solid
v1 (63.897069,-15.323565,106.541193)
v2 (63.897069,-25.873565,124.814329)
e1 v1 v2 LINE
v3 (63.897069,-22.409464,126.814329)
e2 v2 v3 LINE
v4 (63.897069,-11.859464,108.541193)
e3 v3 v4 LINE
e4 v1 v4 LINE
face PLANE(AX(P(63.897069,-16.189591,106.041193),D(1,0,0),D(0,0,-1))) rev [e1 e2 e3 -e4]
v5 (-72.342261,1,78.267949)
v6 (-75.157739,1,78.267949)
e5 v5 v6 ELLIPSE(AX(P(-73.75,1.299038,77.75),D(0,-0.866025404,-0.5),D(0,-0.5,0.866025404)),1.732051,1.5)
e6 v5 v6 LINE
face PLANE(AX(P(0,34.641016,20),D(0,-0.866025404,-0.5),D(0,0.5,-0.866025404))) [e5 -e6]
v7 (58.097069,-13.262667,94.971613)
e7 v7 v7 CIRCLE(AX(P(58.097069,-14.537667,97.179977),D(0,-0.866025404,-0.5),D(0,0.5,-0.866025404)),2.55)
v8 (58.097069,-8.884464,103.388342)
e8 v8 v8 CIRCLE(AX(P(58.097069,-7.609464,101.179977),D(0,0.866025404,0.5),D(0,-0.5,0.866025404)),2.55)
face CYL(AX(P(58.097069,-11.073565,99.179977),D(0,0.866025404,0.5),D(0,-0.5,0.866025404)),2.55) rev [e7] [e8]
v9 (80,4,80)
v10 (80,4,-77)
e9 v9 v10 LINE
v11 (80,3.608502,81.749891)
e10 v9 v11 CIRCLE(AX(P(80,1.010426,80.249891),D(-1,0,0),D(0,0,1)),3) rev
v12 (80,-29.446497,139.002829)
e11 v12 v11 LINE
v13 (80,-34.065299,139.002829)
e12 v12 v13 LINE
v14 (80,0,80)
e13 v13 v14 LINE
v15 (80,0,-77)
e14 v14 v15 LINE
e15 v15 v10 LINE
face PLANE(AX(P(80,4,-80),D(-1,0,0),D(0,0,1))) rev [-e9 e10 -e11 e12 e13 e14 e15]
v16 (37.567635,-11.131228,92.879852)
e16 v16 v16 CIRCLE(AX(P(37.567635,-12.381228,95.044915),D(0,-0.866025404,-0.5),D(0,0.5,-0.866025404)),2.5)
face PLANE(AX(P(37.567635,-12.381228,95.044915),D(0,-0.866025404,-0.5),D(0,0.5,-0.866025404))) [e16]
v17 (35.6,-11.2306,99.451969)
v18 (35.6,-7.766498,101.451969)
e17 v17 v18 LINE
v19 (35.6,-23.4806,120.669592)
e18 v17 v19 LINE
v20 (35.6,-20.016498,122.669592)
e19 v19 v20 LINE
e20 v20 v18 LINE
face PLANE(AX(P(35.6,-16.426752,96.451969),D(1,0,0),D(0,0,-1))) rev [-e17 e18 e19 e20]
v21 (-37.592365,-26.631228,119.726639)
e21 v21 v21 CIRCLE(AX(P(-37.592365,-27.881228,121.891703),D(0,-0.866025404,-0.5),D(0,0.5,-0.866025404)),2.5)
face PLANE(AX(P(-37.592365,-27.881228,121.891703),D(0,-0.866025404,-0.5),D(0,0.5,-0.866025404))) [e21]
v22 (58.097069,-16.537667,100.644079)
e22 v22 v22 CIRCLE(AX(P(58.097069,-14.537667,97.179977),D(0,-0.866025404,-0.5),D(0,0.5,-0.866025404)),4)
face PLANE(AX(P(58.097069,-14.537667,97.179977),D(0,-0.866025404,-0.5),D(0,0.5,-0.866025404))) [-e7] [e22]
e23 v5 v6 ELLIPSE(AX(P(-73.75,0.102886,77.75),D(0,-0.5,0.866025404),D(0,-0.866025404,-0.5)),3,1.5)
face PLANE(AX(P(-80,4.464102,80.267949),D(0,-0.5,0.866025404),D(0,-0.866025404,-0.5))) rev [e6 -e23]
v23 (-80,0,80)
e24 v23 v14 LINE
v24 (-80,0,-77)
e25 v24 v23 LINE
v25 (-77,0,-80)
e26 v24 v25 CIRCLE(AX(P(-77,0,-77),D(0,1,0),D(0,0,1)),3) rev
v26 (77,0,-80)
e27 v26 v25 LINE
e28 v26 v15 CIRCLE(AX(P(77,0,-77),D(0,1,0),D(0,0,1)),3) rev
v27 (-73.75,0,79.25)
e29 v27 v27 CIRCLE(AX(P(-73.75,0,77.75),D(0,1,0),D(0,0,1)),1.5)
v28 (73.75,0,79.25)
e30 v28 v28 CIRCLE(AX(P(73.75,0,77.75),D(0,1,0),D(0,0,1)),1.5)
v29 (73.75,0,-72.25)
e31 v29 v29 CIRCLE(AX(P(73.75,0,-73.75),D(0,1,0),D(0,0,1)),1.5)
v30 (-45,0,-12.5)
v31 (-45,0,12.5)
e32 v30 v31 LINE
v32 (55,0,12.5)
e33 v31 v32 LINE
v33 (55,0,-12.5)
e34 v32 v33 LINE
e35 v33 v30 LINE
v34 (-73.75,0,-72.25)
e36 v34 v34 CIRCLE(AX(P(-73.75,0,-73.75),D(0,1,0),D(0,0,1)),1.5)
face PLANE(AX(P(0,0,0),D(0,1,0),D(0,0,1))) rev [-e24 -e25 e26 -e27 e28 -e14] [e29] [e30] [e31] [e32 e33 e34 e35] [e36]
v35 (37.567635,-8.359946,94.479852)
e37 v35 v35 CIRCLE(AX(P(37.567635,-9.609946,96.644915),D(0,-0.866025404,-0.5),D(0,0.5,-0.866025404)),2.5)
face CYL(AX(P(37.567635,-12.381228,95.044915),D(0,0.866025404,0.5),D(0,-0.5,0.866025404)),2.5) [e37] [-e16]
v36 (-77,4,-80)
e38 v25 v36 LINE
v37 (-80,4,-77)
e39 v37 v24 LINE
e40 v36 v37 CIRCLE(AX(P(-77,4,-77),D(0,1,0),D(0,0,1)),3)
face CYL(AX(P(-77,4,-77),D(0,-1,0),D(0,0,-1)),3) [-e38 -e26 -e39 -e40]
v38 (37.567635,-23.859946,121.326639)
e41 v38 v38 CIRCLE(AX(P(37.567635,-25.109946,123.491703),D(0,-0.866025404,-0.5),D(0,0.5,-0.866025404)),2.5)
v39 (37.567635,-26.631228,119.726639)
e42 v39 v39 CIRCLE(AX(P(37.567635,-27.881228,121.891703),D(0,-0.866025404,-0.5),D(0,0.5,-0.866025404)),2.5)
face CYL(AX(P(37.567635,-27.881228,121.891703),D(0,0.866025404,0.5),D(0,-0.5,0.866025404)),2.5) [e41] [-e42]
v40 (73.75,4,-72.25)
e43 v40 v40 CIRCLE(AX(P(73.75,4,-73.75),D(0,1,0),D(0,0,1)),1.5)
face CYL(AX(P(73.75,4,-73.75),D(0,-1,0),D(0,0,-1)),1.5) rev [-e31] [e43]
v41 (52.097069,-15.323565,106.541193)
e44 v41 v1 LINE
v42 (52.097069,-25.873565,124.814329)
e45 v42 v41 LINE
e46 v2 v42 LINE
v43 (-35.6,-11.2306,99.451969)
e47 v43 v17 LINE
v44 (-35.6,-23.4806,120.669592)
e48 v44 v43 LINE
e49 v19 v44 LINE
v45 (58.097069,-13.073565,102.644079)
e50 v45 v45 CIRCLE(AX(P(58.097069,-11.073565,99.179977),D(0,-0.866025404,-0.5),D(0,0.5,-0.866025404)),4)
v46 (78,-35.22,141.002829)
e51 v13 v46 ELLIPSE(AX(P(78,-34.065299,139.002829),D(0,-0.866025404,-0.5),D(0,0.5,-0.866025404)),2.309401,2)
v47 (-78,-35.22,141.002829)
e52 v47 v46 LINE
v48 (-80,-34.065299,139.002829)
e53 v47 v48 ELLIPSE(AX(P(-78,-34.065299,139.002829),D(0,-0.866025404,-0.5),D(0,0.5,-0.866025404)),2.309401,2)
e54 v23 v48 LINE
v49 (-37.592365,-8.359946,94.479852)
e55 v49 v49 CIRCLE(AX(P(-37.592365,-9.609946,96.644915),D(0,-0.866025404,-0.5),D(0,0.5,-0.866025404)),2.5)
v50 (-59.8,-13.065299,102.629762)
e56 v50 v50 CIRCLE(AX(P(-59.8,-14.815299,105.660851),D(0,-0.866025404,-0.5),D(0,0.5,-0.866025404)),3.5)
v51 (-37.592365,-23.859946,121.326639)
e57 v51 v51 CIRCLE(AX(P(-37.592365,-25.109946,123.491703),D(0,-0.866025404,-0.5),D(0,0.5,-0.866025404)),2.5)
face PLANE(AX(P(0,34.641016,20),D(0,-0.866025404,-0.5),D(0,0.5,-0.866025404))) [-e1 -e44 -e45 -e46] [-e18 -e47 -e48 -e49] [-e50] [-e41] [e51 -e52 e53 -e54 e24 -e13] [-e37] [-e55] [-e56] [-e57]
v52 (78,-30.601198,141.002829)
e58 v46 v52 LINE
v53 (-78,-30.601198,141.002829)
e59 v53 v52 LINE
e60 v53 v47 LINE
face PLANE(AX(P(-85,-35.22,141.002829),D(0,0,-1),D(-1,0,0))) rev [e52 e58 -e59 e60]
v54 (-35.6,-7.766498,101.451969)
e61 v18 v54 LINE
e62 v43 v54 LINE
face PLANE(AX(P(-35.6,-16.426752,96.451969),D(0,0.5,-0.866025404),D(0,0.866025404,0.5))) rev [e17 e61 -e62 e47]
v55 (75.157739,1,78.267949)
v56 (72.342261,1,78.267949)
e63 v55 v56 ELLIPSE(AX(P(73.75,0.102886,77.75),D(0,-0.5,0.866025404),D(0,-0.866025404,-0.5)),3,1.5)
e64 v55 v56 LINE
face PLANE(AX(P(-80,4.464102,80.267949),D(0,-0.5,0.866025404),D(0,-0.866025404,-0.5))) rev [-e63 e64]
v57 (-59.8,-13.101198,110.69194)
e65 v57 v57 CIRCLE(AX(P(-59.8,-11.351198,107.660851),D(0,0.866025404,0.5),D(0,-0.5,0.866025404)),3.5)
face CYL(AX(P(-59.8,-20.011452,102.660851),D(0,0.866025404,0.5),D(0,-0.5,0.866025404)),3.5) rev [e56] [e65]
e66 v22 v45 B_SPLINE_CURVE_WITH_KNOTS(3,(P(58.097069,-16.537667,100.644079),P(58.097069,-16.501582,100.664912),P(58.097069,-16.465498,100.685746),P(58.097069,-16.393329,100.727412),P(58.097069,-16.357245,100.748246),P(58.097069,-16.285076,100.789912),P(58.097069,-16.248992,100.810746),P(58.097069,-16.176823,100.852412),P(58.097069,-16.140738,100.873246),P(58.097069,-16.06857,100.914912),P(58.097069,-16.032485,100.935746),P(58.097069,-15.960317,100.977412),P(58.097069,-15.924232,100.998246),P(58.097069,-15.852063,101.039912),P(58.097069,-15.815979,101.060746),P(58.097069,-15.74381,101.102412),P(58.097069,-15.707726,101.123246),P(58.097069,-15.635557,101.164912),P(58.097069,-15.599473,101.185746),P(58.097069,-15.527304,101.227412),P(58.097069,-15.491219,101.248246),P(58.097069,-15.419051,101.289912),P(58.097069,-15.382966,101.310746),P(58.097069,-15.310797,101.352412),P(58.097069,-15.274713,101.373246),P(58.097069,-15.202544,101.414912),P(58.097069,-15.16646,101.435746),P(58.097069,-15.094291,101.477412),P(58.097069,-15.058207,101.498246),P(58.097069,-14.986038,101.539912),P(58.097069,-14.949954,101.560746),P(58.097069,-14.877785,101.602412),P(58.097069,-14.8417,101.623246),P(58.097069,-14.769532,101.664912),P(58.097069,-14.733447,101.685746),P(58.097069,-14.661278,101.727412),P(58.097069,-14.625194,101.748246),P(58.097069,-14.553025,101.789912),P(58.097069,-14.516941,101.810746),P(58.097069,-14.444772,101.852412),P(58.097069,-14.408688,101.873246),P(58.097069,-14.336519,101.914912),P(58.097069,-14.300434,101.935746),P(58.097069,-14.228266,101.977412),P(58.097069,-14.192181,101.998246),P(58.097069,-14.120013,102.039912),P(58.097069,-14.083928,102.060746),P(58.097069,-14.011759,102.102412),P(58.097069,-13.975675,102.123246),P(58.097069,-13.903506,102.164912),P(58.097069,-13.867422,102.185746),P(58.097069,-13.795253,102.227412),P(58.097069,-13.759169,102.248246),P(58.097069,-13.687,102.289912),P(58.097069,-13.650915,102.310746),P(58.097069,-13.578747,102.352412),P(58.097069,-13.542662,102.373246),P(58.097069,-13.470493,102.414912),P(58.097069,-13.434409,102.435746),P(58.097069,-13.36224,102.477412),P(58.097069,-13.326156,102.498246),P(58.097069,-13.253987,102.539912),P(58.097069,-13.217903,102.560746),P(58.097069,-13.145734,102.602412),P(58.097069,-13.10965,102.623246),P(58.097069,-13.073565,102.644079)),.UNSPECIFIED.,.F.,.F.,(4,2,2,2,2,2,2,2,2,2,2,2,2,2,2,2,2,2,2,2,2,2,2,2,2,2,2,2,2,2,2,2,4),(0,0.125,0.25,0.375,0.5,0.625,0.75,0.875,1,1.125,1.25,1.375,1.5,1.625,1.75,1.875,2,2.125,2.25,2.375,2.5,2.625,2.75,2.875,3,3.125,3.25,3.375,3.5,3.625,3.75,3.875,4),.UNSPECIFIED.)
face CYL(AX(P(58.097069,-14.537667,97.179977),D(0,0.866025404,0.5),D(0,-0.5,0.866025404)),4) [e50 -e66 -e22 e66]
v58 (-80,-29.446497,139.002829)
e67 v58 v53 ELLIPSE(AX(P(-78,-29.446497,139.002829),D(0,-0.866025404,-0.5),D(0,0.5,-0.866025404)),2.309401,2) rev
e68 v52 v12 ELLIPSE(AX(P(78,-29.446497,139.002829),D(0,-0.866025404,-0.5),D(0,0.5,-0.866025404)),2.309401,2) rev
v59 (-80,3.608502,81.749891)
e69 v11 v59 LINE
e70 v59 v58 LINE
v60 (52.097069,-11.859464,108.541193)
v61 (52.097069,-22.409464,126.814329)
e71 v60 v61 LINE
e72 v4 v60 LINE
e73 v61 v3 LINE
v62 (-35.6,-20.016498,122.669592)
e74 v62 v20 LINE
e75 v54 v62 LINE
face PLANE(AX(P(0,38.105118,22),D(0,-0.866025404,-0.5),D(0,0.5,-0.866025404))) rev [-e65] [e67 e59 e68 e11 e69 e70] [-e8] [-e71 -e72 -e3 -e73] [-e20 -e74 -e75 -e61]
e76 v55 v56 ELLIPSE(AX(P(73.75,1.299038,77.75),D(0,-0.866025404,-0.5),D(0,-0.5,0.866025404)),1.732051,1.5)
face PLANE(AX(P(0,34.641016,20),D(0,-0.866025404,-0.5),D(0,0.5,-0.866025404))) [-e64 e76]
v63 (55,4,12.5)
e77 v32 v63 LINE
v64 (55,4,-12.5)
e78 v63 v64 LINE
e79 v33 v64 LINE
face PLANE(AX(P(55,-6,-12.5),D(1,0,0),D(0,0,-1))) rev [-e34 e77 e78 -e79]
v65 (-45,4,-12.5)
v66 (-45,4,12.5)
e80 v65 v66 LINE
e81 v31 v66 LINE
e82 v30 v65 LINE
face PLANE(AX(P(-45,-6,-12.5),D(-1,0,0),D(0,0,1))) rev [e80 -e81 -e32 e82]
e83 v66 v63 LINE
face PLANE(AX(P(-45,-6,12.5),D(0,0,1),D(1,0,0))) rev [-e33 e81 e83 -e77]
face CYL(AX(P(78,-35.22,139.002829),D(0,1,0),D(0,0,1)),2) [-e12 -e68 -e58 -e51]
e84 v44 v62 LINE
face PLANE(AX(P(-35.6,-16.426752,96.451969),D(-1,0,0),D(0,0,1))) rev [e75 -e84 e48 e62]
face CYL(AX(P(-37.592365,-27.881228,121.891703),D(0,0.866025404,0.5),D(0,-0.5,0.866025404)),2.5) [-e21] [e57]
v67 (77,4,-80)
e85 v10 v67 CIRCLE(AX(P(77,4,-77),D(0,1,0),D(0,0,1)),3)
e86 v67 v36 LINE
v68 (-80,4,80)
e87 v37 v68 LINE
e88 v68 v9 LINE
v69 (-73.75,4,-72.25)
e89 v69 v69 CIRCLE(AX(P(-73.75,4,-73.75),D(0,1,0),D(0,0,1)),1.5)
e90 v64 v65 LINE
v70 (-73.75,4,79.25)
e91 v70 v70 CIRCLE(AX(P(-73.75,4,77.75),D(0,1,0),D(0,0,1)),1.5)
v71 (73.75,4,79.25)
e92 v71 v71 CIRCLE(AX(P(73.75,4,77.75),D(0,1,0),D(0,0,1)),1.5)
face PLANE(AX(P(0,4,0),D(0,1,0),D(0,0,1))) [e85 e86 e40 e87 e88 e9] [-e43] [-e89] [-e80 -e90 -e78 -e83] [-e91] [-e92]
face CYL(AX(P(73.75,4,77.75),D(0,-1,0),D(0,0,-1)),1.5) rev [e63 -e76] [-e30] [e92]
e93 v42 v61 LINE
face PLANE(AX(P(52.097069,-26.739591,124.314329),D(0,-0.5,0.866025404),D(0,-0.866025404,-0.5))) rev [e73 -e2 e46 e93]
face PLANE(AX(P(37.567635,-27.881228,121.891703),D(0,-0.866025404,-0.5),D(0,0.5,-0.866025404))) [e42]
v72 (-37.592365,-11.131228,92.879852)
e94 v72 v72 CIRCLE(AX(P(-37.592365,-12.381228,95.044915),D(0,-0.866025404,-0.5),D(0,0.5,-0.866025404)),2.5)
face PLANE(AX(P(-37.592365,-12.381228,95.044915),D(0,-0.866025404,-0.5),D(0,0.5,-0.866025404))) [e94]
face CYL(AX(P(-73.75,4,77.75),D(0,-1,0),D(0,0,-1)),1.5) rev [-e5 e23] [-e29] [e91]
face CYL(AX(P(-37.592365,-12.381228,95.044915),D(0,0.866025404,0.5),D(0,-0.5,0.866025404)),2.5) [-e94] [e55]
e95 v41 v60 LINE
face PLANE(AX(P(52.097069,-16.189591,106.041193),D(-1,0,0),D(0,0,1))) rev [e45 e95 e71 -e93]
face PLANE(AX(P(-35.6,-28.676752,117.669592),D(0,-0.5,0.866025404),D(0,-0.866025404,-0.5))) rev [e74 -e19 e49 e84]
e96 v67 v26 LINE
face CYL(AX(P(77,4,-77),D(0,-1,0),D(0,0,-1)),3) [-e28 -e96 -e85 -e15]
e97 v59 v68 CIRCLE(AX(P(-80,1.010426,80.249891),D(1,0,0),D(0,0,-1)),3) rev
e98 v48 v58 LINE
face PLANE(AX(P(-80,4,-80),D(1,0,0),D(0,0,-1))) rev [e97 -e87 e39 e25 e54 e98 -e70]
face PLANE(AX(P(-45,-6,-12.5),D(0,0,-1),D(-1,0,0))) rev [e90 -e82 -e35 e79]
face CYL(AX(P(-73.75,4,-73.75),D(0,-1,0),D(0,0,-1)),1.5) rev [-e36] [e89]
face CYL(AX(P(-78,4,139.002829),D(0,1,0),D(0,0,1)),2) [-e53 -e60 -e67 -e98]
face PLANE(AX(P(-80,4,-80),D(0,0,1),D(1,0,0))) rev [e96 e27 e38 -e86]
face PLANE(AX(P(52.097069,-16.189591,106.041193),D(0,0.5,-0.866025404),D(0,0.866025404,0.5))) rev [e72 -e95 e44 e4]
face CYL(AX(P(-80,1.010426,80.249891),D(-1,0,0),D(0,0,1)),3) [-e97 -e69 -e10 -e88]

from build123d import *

# Parameters (mm, degrees)
SKETCH1_W           = 160
SKETCH1_H           = 160
SKETCH1_R           = 1.5
BOSS_EXTRUDE1_DEPTH = 4
SKETCH5_W           = 160
SKETCH5_H           = 75
BOSS_EXTRUDE4_DEPTH = 4
FILLET1_R           = 3
FILLET2_R           = 3
FILLET3_R           = 3
CUT_EXTRUDE6_DEPTH  = 165
FILLET8_R           = 2
FILLET9_R           = 2
SKETCH13_W          = 100
SKETCH13_H          = 25
CUT_EXTRUDE7_DEPTH  = 10
SKETCH17_W          = 71.2
SKETCH17_H          = 24.5
CUT_EXTRUDE10_DEPTH = 10
SKETCH20_R          = 2.5
BOSS_EXTRUDE5_DEPTH = 3.2
SKETCH21_W          = 11.8
SKETCH21_H          = 21.1
CUT_EXTRUDE11_DEPTH = 5
SKETCH23_R          = 2.55
CUT_EXTRUDE12_DEPTH = 4
SKETCH24_R          = 4
BOSS_EXTRUDE6_DEPTH = 4
SKETCH25_R          = 2.55
CUT_EXTRUDE15_DEPTH = 4
SKETCH26_R          = 3.5
CUT_EXTRUDE16_DEPTH = 10


with BuildPart() as part:
    # Sketch1 → Boss-Extrude1 (new body)
    with BuildSketch(Plane(origin=(0, 0, 0), x_dir=(1, 0, 0), z_dir=(0, 1, 0))):
        Rectangle(SKETCH1_W, SKETCH1_H)
        with Locations(Location((-73.75, 73.75, 0), (0, 0, 270))):
            Circle(SKETCH1_R, mode=Mode.SUBTRACT)
        with Locations(Location((73.75, 73.75, 0), (0, 0, 270))):
            Circle(SKETCH1_R, mode=Mode.SUBTRACT)
        with Locations(Location((-73.75, -77.75, 0), (0, 0, 270))):
            Circle(SKETCH1_R, mode=Mode.SUBTRACT)
        with Locations(Location((73.75, -77.75, 0), (0, 0, 270))):
            Circle(SKETCH1_R, mode=Mode.SUBTRACT)
    extrude(amount=BOSS_EXTRUDE1_DEPTH)

    # Sketch5 → Boss-Extrude4 (add)
    with BuildSketch(Plane(origin=(0, 34.641016151, 20), x_dir=(1, 0, 0), z_dir=(0, 0.8660254037844346, 0.5000000000000071))):
        with Locations((0, -104.782032303)):
            Rectangle(SKETCH5_W, SKETCH5_H)
    extrude(amount=BOSS_EXTRUDE4_DEPTH)

    # Fillet1
    # the kernel refuses this fillet: 3 mm, written as the material it takes off along each edge
    with BuildSketch(Plane(origin=(-84.277998386, 4.464101615, 80.267949192), x_dir=(0, -0.8660254037849107, -0.4999999999991824), z_dir=(1, 0, 0))) as fillet1_piece_1:
        with BuildLine():
            CenterArc((3, -1.711199354), FILLET1_R, 145.221891332, 34.778108668)
            Line((0, -1.711199354), (-0.06, -1.711199354))
            Line((-0.06, -1.711199354), (-0.06, 0))
            Line((-0.06, 0), (0, 0.06))
            ThreePointArc((0, 0.06), (0.267949192, 0.06), (0.486616353, 0.034223987))
            Line((0.486616353, 0.034223987), (0.535898385, 0))
        make_face()
    extrude(amount=168.555996772, mode=Mode.SUBTRACT)

    # Fillet2
    fillet2_edges = [part.edges().sort_by_distance(p)[0] for p in [
        (80, 2, -80),
    ]]
    fillet(fillet2_edges, radius=FILLET2_R)

    # Fillet3
    fillet3_edges = [part.edges().sort_by_distance(p)[0] for p in [
        (-80, 2, -80),
    ]]
    fillet(fillet3_edges, radius=FILLET3_R)

    # Sketch12 → Cut-Extrude6 (cut)
    with BuildSketch(Plane(origin=(80, 0, 0), x_dir=(0, 0, -1), z_dir=(1, 0, 0))):
        Polygon((-145.219854476, -33.035898385), (-143.219854476, -36.5), (-141.002829443, -35.22), (-141.002829443, -30.601197846), align=None)
    extrude(amount=-CUT_EXTRUDE6_DEPTH, mode=Mode.SUBTRACT)

    # Fillet8
    fillet8_edges = [part.edges().sort_by_distance(p)[0] for p in [
        (80, -32.910598923, 141.002829443),
    ]]
    fillet(fillet8_edges, radius=FILLET8_R)

    # Fillet9
    fillet9_edges = [part.edges().sort_by_distance(p)[0] for p in [
        (-80, -32.910598923, 141.002829443),
    ]]
    fillet(fillet9_edges, radius=FILLET9_R)

    # Sketch13 → Cut-Extrude7 (cut)
    with BuildSketch(Plane(origin=(0, 4, 0), x_dir=(1, 0, 0), z_dir=(0, 1, 0))):
        with Locations((5, 0)):
            Rectangle(SKETCH13_W, SKETCH13_H)
    extrude(amount=-CUT_EXTRUDE7_DEPTH, mode=Mode.SUBTRACT)

    # Sketch17 → Cut-Extrude10 (cut)
    with BuildSketch(Plane(origin=(0, 38.105117767, 22), x_dir=(1, 0, 0), z_dir=(0, 0.8660254037844344, 0.5000000000000073))):
        with Locations((0, -103.993231657)):
            Rectangle(SKETCH17_W, SKETCH17_H)
    extrude(amount=-CUT_EXTRUDE10_DEPTH, mode=Mode.SUBTRACT)

    # Sketch20 → Boss-Extrude5 (add)
    with BuildSketch(Plane(origin=(0, 34.641016151, 20), x_dir=(1, 0, 0), z_dir=(0, -0.8660254037844344, -0.5000000000000073))):
        with Locations(Location((-37.592365001, 119.501924995, 0), (0, 0, 270))):
            Circle(SKETCH20_R)
        with Locations(Location((37.567634999, 88.501924995, 0), (0, 0, 270))):
            Circle(SKETCH20_R)
        with Locations(Location((37.567634999, 119.501924995, 0), (0, 0, 270))):
            Circle(SKETCH20_R)
        with Locations(Location((-37.592365001, 88.501924995, 0), (0, 0, 270))):
            Circle(SKETCH20_R)
    extrude(amount=BOSS_EXTRUDE5_DEPTH)

    # Sketch21 → Cut-Extrude11 (cut)
    with BuildSketch(Plane(origin=(0, 38.105117767, 22), x_dir=(1, 0, 0), z_dir=(0, 0.8660254037844344, 0.5000000000000073))):
        with Locations((57.997068985, -110.479162625)):
            Rectangle(SKETCH21_W, SKETCH21_H)
    extrude(amount=-CUT_EXTRUDE11_DEPTH, mode=Mode.SUBTRACT)

    # Sketch23 → Cut-Extrude12 (cut)
    with BuildSketch(Plane(origin=(0, 38.105117767, 22), x_dir=(1, 0, 0), z_dir=(0, 0.8660254037844345, 0.5000000000000074))):
        with Locations(Location((58.097068985, -91.429162625, 0), (0, 0, 270))):
            Circle(SKETCH23_R)
    extrude(amount=-CUT_EXTRUDE12_DEPTH, mode=Mode.SUBTRACT)

    # Sketch24 → Boss-Extrude6 (add)
    with BuildSketch(Plane(origin=(0, 34.641016151, 20), x_dir=(1, 0, 0), z_dir=(0, -0.8660254037844344, -0.5000000000000073))):
        with Locations(Location((58.097068985, 91.429162625, 0), (0, 0, 90))):
            Circle(SKETCH24_R)
    extrude(amount=BOSS_EXTRUDE6_DEPTH)

    # Sketch25 → Cut-Extrude15 (cut)
    with BuildSketch(Plane(origin=(0, 34.641016151, 20), x_dir=(1, 0, 0), z_dir=(0, -0.8660254037844345, -0.5000000000000074))):
        with Locations(Location((58.097068985, 91.429162625, 0), (0, 0, 90))):
            Circle(SKETCH25_R)
    extrude(amount=CUT_EXTRUDE15_DEPTH, mode=Mode.SUBTRACT)

    # Sketch26 → Cut-Extrude16 (cut)
    with BuildSketch(Plane(origin=(0, 38.105117767, 22), x_dir=(1, 0, 0), z_dir=(0, 0.8660254037844345, 0.5000000000000074))):
        with Locations(Location((-59.8, -98.912631226, 0), (0, 0, 270))):
            Circle(SKETCH26_R)
    extrude(amount=-CUT_EXTRUDE16_DEPTH, mode=Mode.SUBTRACT)


solid = part.part
